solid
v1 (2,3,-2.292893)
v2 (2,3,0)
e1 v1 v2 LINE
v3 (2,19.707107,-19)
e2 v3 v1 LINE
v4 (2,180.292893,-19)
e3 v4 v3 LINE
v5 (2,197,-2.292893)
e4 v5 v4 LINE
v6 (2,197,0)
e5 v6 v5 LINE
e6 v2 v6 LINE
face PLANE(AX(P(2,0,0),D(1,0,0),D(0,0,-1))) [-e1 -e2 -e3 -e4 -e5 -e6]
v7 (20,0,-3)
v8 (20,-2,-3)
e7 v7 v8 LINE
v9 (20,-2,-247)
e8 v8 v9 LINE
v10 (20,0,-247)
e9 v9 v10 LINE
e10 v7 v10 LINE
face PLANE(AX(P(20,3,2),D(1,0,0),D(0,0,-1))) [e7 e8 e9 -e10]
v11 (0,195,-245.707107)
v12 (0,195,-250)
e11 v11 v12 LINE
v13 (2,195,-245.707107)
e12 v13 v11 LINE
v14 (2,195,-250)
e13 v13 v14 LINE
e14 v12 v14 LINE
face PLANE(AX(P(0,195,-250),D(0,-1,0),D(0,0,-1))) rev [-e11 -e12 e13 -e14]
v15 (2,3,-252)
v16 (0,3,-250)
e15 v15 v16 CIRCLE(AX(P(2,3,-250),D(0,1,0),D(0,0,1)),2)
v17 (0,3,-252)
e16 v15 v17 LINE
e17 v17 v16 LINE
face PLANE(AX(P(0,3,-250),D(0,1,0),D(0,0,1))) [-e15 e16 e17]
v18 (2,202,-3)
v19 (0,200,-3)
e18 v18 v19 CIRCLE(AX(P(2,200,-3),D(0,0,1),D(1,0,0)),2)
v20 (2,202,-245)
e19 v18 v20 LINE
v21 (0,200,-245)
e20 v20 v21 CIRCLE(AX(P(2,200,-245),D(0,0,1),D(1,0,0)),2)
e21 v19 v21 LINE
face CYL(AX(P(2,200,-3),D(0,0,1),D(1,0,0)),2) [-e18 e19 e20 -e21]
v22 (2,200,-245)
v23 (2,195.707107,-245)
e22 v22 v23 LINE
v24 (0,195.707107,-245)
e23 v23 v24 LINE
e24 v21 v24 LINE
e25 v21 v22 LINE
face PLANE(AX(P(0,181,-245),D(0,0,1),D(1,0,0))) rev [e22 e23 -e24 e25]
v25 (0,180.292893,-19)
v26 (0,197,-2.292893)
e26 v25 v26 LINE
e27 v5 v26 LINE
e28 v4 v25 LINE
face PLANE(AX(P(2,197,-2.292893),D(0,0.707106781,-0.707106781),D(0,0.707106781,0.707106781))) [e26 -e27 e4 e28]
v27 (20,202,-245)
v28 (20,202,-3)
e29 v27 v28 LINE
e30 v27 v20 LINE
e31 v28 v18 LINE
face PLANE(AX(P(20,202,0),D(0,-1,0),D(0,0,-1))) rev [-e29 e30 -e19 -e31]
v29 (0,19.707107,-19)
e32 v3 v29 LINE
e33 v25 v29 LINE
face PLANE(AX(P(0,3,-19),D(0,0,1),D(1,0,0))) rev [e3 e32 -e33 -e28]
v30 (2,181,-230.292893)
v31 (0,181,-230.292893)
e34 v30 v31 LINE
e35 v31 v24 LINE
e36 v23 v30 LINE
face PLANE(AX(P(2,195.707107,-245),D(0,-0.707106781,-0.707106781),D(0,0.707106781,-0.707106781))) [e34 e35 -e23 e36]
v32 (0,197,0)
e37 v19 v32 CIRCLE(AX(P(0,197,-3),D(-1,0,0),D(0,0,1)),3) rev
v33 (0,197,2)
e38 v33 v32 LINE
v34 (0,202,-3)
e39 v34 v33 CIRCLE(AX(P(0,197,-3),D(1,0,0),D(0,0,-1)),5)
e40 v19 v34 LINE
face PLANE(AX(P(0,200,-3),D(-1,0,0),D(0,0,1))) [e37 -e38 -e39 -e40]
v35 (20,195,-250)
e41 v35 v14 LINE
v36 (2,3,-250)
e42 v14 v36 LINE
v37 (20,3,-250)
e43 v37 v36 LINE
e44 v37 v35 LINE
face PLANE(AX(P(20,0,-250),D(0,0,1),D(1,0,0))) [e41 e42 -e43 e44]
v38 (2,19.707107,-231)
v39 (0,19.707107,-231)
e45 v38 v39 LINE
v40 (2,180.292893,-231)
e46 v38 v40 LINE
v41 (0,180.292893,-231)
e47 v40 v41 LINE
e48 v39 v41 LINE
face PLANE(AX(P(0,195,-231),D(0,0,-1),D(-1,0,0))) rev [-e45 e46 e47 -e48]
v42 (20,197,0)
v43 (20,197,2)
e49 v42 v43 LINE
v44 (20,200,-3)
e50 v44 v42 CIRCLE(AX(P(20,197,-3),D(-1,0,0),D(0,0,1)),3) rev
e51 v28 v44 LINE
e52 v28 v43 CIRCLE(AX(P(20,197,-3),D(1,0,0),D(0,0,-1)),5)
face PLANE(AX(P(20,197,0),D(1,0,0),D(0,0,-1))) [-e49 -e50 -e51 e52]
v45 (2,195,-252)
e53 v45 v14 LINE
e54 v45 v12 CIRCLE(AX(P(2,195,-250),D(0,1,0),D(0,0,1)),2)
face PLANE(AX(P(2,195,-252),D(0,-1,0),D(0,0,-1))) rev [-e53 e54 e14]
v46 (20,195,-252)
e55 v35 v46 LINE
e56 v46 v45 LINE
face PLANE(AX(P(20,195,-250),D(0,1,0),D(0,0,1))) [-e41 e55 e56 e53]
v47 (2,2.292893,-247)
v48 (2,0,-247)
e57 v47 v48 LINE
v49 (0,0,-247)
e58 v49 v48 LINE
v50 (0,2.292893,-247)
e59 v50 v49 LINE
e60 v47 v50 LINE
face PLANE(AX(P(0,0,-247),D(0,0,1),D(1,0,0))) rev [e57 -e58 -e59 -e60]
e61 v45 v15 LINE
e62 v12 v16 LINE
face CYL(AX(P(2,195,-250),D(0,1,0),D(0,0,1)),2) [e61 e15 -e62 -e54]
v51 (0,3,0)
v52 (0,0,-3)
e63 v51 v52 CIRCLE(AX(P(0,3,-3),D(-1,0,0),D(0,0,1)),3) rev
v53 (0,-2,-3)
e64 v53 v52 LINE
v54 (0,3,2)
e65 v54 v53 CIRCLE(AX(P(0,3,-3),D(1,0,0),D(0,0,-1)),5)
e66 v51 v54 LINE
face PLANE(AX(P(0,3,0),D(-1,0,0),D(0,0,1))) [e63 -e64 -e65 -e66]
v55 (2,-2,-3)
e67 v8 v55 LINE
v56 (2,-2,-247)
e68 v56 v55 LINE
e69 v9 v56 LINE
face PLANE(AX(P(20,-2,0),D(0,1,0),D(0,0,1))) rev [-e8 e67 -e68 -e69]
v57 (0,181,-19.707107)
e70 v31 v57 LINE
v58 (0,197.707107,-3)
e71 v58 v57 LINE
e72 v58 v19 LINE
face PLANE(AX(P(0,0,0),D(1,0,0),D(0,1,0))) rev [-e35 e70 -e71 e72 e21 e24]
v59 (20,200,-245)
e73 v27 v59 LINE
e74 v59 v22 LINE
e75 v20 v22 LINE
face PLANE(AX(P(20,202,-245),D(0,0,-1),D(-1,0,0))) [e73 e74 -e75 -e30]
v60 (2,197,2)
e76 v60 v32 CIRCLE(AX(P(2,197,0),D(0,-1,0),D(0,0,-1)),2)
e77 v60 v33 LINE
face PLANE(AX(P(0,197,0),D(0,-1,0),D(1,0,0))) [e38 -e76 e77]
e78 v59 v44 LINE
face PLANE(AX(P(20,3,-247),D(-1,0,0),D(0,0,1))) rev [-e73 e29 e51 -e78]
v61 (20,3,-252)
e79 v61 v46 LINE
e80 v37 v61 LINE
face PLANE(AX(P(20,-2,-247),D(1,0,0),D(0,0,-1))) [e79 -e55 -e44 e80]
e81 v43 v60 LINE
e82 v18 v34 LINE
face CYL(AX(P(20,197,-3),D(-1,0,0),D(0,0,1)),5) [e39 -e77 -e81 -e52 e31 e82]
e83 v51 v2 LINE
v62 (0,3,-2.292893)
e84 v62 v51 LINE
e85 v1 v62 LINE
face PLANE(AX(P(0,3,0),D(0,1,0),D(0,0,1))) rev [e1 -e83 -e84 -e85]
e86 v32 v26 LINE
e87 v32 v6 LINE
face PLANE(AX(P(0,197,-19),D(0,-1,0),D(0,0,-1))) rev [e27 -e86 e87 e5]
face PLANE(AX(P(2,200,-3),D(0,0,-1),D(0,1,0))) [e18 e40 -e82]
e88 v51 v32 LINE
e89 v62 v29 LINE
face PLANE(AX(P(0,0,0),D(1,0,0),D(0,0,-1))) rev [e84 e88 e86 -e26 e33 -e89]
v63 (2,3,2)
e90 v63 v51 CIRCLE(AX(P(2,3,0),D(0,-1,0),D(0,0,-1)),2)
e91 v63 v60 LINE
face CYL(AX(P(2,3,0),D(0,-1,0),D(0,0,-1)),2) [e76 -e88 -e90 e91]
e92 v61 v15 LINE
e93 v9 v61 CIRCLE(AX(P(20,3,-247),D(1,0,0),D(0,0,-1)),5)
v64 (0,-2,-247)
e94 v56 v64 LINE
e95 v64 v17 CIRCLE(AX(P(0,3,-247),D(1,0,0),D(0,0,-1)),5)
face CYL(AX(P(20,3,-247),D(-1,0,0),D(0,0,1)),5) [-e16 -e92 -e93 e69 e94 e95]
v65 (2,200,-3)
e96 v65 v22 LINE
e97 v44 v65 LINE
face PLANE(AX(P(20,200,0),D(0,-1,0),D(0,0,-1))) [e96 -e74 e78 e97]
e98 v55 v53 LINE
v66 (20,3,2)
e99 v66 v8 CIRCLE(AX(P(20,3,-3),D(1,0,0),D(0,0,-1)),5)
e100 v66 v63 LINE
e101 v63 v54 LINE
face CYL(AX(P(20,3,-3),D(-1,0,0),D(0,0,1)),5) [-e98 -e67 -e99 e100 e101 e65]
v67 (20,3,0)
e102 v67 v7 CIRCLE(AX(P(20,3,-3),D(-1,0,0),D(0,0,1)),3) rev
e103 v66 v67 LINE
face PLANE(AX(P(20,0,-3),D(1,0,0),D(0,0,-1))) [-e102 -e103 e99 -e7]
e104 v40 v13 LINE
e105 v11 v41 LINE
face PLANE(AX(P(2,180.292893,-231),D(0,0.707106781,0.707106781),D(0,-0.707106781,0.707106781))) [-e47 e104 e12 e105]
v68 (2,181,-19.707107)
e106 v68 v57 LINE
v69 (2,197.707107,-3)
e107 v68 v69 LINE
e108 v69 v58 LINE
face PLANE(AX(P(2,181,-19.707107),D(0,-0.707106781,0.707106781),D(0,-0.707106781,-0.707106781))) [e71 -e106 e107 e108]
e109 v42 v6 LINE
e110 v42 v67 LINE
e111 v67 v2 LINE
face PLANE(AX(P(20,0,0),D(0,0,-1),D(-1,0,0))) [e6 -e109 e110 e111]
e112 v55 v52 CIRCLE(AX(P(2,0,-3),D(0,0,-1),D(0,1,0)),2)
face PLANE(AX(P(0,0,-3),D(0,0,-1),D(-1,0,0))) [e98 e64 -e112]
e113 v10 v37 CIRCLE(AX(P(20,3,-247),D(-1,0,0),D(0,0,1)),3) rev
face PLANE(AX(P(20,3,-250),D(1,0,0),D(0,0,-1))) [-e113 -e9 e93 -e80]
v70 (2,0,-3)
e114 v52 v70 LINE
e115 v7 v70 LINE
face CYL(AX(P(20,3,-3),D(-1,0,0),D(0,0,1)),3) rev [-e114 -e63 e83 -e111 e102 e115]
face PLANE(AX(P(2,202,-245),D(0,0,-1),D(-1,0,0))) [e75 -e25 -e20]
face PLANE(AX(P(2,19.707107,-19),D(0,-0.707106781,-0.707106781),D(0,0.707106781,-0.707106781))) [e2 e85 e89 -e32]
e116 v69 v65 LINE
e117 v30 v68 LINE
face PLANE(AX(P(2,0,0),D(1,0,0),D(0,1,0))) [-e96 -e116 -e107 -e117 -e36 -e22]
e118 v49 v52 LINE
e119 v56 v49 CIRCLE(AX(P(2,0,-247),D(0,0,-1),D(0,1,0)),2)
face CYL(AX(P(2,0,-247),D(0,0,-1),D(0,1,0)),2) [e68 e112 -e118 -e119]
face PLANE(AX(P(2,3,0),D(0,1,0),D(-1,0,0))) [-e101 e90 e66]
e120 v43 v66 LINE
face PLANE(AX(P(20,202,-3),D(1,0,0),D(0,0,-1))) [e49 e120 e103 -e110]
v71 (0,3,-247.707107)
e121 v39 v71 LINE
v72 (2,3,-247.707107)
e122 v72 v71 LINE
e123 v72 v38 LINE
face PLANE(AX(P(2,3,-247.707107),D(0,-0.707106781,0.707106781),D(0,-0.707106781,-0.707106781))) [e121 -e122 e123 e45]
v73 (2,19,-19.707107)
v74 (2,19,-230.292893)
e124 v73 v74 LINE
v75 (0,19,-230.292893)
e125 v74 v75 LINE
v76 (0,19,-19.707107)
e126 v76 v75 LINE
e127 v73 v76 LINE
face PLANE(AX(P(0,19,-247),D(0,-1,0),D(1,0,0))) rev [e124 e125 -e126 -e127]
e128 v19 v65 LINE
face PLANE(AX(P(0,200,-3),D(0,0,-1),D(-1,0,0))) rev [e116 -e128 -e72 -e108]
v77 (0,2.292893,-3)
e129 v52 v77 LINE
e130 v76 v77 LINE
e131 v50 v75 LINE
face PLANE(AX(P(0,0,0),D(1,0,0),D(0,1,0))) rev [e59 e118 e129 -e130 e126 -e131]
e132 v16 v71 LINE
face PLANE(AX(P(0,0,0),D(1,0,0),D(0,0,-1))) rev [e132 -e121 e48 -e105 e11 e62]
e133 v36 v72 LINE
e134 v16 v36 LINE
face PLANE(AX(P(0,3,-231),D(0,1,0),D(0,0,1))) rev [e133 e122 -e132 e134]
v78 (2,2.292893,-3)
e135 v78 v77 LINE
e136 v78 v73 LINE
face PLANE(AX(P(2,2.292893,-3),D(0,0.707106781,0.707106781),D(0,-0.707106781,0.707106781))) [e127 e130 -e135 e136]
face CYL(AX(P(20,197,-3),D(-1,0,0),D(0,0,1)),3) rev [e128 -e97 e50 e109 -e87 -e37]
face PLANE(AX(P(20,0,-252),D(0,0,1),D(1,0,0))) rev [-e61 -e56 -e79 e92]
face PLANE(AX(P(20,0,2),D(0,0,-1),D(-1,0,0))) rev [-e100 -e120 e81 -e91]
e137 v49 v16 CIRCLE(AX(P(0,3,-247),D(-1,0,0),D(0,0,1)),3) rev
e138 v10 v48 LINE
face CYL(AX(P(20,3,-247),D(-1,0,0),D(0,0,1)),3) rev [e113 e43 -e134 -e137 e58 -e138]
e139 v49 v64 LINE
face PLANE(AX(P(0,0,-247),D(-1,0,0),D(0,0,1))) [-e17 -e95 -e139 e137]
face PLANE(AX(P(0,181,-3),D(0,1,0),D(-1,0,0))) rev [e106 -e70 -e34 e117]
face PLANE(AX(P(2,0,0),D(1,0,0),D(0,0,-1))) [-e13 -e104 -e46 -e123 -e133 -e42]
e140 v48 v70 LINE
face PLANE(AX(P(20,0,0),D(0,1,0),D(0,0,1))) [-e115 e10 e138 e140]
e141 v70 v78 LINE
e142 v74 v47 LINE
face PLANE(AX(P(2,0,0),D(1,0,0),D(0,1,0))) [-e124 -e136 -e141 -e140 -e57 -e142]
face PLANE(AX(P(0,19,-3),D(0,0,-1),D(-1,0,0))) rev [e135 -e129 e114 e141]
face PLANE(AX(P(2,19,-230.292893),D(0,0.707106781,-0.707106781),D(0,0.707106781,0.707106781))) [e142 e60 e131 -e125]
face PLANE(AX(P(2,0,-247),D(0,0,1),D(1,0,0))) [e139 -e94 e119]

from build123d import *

# Parameters (mm, degrees)
BASE_FLANGE1_DEPTH       = 20
EDGE_FLANGE1_START       = -2
EDGE_FLANGE1_DEPTH       = 2
EDGE_FLANGE1_START_2     = -250
EDGE_FLANGE1_2_OUTLINE_W = 2
EDGE_FLANGE1_2_OUTLINE_H = 192
EDGE_FLANGE1_2_DEPTH     = 2.292893219
EDGE_FLANGE1_3_DEPTH     = 2
EDGE_FLANGE1_START_3     = -247
EDGE_FLANGE1_4_DEPTH     = 244
EDGE_FLANGE1_START_4     = 3
EDGE_FLANGE1_5_DEPTH     = 194


with BuildPart() as part:
    # Base-Flange1: sheet metal written as solids
    # Sketch1 → Base-Flange1 (new body)
    with BuildSketch(Plane(origin=(0, 0, 0), x_dir=(0, 0, -1), z_dir=(1, 0, 0))):
        with BuildLine():
            Line((245, 200), (3, 200))
            ThreePointArc((3, 200), (0.878679656, 199.121320344), (0, 197))
            Line((0, 197), (0, 3))
            ThreePointArc((0, 3), (0.878679656, 0.878679656), (3, 0))
            Line((3, 0), (247, 0))
            ThreePointArc((247, 0), (249.121320344, 0.878679656), (250, 3))
            Line((250, 3), (250, 195))
            Line((250, 195), (252, 195))
            Line((252, 195), (252, 3))
            ThreePointArc((252, 3), (250.535533906, -0.535533906), (247, -2))
            Line((247, -2), (3, -2))
            ThreePointArc((3, -2), (-0.535533906, -0.535533906), (-2, 3))
            Line((-2, 3), (-2, 197))
            ThreePointArc((-2, 197), (-0.535533906, 200.535533906), (3, 202))
            Line((3, 202), (245, 202))
            Line((245, 202), (245, 200))
        make_face()
    extrude(amount=BASE_FLANGE1_DEPTH)

    # Edge-Flange1: read off the stored shape, not the designer's step
    # Edge-Flange1 outline → Edge-Flange1 (add)
    with BuildSketch(Plane(origin=(0, 200, 0), x_dir=(0, 0, -1), z_dir=(-1, 0, 0)).offset(EDGE_FLANGE1_START)):
        Polygon((247, 197.707106781), (247, 200), (3, 200), (3, 197.707106781), (19.707106781, 181), (230.292893219, 181), align=None)
        Polygon((2.292893219, 197), (0, 197), (0, 3), (2.292893219, 3), (19, 19.707106781), (19, 180.292893219), align=None)
        Polygon((245, 0), (245, 4.292893219), (230.292893219, 19), (19.707106781, 19), (3, 2.292893219), (3, 0), align=None)
    extrude(amount=EDGE_FLANGE1_DEPTH)

    # Edge-Flange1 2 outline → Edge-Flange1 2 (add)
    with BuildSketch(Plane.XY.offset(EDGE_FLANGE1_START_2)):
        with Locations((1, 99)):
            Rectangle(EDGE_FLANGE1_2_OUTLINE_W, EDGE_FLANGE1_2_OUTLINE_H)
    extrude(amount=EDGE_FLANGE1_2_DEPTH)

    # Edge-Flange1 3 outline → Edge-Flange1 3 (add)
    with BuildSketch(Plane.YZ):
        Polygon((180.292893219, -231), (19.707106781, -231), (3, -247.707106781), (195, -247.707106781), (195, -245.707106781), align=None)
    extrude(amount=EDGE_FLANGE1_3_DEPTH)

    # Edge-Flange1 4 outline → Edge-Flange1 4 (cut)
    with BuildSketch(Plane.XY.offset(EDGE_FLANGE1_START_3)):
        with BuildLine():
            Line((0, -2), (2, -2))
            ThreePointArc((2, -2), (0.585786438, -1.414213562), (0, 0))
            Line((0, 0), (0, -2))
        make_face()
        with BuildLine():
            Line((0, 202), (0, 200))
            ThreePointArc((0, 200), (0.585786438, 201.414213562), (2, 202))
            Line((2, 202), (0, 202))
        make_face()
    extrude(amount=EDGE_FLANGE1_4_DEPTH, mode=Mode.SUBTRACT)

    # Edge-Flange1 5 outline → Edge-Flange1 5 (cut)
    with BuildSketch(Plane(origin=(0, 0, 0), x_dir=(1, 0, 0), z_dir=(0, 1, 0)).offset(EDGE_FLANGE1_START_4)):
        with BuildLine():
            Line((0, -2), (2, -2))
            ThreePointArc((2, -2), (0.585786438, -1.414213562), (0, 0))
            Line((0, 0), (0, -2))
        make_face()
        with BuildLine():
            Line((0, 252), (0, 250))
            ThreePointArc((0, 250), (0.585786438, 251.414213562), (2, 252))
            Line((2, 252), (0, 252))
        make_face()
    extrude(amount=EDGE_FLANGE1_5_DEPTH, mode=Mode.SUBTRACT)


solid = part.part
